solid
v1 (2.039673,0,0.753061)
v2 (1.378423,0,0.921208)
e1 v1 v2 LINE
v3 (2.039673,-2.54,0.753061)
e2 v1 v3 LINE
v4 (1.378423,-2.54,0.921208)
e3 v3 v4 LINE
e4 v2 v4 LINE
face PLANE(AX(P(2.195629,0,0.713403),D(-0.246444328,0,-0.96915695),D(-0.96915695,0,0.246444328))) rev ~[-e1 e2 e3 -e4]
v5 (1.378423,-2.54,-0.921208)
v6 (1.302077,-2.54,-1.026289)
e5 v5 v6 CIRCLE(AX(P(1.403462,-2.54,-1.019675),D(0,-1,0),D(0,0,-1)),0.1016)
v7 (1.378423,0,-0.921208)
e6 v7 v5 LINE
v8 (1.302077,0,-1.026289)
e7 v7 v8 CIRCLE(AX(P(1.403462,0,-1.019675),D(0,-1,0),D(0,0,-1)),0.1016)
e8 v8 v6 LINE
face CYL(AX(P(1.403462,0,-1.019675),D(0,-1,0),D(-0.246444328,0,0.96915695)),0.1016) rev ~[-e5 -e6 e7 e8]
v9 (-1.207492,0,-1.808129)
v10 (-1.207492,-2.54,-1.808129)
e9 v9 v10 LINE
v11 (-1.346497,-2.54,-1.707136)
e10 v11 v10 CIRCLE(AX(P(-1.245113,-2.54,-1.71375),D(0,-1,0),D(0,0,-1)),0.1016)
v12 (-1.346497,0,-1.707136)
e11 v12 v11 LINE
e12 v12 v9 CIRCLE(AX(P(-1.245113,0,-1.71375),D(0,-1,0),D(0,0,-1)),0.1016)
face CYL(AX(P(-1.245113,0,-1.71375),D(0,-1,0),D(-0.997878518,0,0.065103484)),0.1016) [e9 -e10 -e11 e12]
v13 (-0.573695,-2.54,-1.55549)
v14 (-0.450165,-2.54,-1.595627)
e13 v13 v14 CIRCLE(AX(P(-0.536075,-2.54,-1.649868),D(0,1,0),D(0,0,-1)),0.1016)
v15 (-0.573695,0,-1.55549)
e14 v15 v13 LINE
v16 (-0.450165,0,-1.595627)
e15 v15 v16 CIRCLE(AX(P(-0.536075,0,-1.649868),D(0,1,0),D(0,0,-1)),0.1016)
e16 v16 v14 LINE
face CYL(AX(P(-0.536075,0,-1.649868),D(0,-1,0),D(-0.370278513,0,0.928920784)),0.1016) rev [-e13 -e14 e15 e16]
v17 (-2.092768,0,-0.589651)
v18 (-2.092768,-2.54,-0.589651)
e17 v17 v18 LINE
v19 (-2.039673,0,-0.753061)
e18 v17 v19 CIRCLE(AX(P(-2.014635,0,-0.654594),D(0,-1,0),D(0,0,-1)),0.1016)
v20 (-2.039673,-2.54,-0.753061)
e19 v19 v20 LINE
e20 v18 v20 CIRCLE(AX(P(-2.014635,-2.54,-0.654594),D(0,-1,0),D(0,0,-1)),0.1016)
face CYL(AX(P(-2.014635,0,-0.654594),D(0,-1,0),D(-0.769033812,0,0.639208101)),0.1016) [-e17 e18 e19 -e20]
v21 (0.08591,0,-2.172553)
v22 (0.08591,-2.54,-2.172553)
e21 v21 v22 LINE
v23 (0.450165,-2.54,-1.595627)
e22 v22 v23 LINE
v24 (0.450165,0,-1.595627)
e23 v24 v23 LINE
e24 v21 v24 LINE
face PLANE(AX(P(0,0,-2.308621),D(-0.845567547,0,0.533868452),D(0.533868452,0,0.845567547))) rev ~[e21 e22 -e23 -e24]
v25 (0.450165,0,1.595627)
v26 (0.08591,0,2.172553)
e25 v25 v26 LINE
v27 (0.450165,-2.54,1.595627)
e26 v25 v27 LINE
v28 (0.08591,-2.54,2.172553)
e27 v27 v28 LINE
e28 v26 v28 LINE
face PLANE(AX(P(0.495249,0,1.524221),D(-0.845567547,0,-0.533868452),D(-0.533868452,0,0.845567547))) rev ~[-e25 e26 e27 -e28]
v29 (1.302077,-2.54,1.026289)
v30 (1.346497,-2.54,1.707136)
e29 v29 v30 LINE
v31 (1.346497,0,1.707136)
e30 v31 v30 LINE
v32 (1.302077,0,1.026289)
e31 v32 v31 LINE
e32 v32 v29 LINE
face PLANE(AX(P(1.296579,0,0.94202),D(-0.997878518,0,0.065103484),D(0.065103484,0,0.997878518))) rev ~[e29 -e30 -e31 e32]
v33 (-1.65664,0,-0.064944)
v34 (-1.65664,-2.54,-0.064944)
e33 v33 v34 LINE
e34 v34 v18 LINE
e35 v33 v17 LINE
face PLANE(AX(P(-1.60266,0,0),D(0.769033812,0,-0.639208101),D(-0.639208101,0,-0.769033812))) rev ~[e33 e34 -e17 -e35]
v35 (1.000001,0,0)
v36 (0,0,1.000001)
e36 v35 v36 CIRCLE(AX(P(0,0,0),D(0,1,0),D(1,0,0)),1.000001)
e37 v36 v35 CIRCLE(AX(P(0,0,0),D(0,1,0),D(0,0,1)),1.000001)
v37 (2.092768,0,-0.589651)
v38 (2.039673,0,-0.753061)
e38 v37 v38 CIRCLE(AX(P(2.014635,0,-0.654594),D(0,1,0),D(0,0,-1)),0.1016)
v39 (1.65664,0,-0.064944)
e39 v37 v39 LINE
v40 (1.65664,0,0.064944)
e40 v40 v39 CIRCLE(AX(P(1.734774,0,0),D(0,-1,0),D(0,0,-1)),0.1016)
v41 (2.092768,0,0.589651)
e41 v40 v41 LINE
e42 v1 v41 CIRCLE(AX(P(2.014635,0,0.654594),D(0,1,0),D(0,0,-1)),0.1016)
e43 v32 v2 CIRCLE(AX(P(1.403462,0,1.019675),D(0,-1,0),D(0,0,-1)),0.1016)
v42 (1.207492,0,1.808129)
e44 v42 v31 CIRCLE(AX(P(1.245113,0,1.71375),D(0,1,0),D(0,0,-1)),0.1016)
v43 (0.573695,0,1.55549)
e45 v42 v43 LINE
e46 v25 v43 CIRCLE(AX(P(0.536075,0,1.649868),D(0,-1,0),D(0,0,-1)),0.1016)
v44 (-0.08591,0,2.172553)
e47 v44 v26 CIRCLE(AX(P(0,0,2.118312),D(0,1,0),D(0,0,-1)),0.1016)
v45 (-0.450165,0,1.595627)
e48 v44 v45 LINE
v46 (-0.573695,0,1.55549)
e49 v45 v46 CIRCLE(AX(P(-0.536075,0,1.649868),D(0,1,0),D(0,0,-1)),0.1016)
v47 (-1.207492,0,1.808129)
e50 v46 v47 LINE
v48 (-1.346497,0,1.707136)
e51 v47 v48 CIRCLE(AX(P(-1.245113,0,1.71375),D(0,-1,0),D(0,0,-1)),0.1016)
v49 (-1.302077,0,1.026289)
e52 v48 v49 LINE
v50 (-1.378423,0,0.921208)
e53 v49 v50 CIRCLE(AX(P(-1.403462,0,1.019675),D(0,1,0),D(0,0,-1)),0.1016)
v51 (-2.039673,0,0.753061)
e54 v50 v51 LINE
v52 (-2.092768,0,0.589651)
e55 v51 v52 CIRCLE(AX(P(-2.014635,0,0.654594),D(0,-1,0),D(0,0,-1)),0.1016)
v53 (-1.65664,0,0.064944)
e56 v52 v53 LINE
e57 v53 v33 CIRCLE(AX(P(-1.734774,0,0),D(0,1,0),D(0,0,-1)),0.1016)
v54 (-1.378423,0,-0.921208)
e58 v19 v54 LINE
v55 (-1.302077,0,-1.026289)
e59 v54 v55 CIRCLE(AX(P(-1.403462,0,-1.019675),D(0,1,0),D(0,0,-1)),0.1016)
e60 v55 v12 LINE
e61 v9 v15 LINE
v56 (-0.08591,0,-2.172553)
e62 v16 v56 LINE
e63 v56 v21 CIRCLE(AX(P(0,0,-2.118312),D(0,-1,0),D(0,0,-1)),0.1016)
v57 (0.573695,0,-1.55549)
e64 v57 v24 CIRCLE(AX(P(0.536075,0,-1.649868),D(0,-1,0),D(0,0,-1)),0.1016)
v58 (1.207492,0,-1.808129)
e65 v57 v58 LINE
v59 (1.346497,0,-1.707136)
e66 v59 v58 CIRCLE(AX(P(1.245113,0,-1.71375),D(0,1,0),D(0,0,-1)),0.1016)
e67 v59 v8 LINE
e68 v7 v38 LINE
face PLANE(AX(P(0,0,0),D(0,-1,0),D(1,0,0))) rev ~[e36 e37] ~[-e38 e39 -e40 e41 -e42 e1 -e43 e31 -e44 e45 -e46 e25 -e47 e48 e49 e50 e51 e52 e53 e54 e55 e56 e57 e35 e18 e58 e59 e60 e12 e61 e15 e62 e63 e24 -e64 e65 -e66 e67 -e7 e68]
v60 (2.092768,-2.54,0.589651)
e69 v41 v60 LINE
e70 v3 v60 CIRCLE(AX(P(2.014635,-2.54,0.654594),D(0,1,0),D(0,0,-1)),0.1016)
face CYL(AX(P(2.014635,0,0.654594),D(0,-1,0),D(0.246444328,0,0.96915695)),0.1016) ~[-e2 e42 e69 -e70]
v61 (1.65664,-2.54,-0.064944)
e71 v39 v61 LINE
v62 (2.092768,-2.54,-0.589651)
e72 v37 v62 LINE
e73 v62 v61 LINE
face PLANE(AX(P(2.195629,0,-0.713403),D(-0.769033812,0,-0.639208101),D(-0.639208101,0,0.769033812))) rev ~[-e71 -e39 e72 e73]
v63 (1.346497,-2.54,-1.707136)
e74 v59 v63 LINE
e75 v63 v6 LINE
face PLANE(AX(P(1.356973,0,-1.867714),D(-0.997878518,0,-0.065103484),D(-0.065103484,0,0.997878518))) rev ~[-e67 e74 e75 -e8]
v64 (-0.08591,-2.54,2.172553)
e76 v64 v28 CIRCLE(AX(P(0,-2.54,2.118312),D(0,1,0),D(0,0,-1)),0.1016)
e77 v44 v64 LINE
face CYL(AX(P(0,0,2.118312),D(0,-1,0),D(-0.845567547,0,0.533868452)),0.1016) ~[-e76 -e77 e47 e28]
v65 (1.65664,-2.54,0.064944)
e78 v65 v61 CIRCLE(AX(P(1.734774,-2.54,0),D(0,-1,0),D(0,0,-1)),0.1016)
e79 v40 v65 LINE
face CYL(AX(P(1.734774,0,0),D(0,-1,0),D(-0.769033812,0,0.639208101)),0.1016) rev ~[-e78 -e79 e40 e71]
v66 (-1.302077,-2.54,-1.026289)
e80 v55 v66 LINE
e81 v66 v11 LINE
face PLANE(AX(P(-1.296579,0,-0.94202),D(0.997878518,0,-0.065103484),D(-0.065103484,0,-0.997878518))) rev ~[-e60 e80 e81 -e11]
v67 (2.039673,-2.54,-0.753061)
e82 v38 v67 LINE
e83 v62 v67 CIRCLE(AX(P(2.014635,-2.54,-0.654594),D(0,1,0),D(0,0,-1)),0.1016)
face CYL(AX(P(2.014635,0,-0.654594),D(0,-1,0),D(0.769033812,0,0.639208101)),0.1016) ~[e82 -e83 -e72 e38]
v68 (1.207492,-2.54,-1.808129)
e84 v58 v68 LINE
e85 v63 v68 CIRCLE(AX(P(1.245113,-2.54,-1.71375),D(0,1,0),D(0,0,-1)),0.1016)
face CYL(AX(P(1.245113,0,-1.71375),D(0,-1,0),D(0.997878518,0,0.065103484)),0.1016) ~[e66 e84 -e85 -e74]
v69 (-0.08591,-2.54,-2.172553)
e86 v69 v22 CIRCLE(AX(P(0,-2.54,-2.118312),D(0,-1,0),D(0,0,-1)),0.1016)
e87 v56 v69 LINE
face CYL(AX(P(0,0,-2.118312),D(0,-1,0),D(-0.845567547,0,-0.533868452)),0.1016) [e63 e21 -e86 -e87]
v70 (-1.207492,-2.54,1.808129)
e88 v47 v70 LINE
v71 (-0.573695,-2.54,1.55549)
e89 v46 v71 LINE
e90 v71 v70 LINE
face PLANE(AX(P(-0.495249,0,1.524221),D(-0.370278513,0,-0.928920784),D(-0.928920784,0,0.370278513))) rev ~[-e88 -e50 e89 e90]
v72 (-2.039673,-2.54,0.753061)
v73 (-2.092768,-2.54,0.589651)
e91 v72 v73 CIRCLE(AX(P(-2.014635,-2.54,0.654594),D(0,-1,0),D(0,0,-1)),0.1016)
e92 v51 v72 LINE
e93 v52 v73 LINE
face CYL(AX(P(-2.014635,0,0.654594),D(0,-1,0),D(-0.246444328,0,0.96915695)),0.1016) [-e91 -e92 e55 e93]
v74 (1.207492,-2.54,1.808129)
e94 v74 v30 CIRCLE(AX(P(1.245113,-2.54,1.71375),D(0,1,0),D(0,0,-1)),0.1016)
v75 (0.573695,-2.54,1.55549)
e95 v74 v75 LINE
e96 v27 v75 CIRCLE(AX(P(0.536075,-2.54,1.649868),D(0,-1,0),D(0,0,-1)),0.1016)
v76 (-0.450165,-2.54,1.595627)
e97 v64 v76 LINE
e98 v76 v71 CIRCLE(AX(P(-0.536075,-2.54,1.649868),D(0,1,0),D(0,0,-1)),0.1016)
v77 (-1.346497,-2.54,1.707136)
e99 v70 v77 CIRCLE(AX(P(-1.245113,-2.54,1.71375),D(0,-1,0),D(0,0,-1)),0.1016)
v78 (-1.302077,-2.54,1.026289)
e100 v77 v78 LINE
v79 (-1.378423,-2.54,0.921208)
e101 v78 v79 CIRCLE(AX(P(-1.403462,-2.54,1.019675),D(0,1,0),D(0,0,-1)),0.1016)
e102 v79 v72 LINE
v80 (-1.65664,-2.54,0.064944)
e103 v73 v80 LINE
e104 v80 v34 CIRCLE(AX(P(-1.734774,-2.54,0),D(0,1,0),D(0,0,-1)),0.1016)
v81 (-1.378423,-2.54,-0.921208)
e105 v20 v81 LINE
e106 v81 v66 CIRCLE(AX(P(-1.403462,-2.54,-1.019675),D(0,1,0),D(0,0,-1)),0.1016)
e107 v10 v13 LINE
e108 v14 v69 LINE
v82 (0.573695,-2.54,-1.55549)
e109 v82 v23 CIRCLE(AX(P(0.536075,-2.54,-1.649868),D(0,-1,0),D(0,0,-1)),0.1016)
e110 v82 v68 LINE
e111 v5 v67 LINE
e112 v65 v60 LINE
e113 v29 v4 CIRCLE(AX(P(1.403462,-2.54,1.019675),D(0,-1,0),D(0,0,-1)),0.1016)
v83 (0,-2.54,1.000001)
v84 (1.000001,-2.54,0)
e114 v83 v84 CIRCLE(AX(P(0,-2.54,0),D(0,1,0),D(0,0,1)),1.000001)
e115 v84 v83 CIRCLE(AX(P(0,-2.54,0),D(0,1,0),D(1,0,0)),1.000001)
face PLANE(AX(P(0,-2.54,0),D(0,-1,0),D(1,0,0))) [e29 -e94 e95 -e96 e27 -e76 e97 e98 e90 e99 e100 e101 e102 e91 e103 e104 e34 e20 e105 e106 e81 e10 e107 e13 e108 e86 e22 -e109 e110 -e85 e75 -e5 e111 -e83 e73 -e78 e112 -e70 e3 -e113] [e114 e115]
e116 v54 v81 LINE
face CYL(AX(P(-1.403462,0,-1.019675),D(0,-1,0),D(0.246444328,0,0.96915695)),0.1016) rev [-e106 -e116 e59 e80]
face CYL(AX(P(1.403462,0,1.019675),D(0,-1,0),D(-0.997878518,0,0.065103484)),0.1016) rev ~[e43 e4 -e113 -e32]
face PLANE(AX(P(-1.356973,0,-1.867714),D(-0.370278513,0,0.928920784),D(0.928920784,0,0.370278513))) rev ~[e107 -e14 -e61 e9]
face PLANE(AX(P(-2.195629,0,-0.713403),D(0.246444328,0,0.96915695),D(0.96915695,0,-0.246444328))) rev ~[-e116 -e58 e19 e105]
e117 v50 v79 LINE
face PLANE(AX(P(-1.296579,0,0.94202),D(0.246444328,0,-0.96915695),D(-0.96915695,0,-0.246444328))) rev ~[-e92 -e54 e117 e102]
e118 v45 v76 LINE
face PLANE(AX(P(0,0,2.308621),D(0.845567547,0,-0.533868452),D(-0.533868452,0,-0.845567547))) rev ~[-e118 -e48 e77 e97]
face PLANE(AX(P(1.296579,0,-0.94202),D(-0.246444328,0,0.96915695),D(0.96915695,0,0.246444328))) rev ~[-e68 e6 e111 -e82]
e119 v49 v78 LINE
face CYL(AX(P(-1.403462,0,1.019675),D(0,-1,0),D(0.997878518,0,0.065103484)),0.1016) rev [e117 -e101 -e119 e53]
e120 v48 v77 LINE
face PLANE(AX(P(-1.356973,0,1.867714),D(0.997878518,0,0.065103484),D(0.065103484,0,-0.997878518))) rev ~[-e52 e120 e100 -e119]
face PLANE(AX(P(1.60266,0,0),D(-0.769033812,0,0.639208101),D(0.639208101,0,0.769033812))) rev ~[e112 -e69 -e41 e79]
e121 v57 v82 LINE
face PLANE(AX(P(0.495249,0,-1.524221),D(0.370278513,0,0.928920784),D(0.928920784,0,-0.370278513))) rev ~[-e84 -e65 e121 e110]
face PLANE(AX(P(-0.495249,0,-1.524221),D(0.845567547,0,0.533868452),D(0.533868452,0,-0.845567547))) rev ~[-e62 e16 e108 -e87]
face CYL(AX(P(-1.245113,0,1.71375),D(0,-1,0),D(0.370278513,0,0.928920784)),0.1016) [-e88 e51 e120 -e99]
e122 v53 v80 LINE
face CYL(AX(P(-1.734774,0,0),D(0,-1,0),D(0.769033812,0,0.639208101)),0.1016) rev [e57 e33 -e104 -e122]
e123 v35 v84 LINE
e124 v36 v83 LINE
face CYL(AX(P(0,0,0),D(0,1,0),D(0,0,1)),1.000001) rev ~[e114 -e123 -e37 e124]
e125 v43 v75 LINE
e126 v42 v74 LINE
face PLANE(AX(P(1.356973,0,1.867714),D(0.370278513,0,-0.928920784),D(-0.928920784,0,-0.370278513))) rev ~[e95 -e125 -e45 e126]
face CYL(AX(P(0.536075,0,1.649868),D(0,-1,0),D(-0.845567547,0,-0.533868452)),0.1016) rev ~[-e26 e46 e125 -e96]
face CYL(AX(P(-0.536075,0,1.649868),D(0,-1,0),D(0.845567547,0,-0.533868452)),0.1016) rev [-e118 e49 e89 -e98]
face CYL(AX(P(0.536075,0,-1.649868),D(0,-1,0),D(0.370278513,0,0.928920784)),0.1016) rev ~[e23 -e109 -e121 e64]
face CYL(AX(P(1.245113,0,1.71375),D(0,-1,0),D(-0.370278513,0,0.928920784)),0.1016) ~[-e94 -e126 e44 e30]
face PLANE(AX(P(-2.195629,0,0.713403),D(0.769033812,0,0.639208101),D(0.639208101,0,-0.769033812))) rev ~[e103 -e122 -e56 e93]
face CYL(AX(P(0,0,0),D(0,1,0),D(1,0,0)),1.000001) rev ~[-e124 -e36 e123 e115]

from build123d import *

# Parameters (mm, degrees)
F1_DEPTH = 2.54
F2_R     = 0.1016


# Not quite as in the source:
# - a feature names something its author has since deleted; it is built from what else it names


with BuildPart() as f1:
    # F0 (on Front) → F1 (new body)
    with BuildSketch(Plane.XZ):
        Polygon((0, 2.3086211489), (-0.4952492845, 1.5242205696), (-1.3569734644, 1.867713743), (-1.2965794597, 0.9420201184), (-2.1956291873, 0.7134031686), (-1.6026603504, 0), (-2.1956291873, -0.7134031686), (-1.2965794597, -0.9420201184), (-1.3569734644, -1.867713743), (-0.4952492845, -1.5242205696), (0, -2.3086211489), (0.4952492845, -1.5242205696), (1.3569734644, -1.867713743), (1.2965794597, -0.9420201184), (2.1956291873, -0.7134031686), (1.6026603504, 0), (2.1956291873, 0.7134031686), (1.2965794597, 0.9420201184), (1.3569734644, 1.867713743), (0.4952492845, 1.5242205696), align=None)
        with BuildLine():
            ThreePointArc((0, 1.00000054), (0.707107163, 0.707107163), (1.00000054, 0))
            ThreePointArc((1.00000054, 0), (-0.707107163, -0.707107163), (0, 1.00000054))
        make_face(mode=Mode.SUBTRACT)
    extrude(amount=F1_DEPTH)

    # F2
    f2_edges = [f1.edges().sort_by_distance(p)[0] for p in [
        (0, -1.27, 2.308621),
        (0.495249, -1.27, 1.524221),
        (1.356973, -1.27, 1.867714),
        (1.296579, -1.27, 0.94202),
        (2.195629, -1.27, 0.713403),
        (1.60266, -1.27, 0),
        (2.195629, -1.27, -0.713403),
        (1.296579, -1.27, -0.94202),
        (1.356973, -1.27, -1.867714),
        (0.495249, -1.27, -1.524221),
        (0, -1.27, -2.308621),
        (-1.356973, -1.27, -1.867714),
        (-0.495249, -1.27, -1.524221),
        (-1.296579, -1.27, -0.94202),
        (-2.195629, -1.27, -0.713403),
        (-1.60266, -1.27, 0),
        (-2.195629, -1.27, 0.713403),
        (-1.296579, -1.27, 0.94202),
        (-1.356973, -1.27, 1.867714),
        (-0.495249, -1.27, 1.524221),
    ]]
    fillet(f2_edges, radius=F2_R)


solid = f1.part
